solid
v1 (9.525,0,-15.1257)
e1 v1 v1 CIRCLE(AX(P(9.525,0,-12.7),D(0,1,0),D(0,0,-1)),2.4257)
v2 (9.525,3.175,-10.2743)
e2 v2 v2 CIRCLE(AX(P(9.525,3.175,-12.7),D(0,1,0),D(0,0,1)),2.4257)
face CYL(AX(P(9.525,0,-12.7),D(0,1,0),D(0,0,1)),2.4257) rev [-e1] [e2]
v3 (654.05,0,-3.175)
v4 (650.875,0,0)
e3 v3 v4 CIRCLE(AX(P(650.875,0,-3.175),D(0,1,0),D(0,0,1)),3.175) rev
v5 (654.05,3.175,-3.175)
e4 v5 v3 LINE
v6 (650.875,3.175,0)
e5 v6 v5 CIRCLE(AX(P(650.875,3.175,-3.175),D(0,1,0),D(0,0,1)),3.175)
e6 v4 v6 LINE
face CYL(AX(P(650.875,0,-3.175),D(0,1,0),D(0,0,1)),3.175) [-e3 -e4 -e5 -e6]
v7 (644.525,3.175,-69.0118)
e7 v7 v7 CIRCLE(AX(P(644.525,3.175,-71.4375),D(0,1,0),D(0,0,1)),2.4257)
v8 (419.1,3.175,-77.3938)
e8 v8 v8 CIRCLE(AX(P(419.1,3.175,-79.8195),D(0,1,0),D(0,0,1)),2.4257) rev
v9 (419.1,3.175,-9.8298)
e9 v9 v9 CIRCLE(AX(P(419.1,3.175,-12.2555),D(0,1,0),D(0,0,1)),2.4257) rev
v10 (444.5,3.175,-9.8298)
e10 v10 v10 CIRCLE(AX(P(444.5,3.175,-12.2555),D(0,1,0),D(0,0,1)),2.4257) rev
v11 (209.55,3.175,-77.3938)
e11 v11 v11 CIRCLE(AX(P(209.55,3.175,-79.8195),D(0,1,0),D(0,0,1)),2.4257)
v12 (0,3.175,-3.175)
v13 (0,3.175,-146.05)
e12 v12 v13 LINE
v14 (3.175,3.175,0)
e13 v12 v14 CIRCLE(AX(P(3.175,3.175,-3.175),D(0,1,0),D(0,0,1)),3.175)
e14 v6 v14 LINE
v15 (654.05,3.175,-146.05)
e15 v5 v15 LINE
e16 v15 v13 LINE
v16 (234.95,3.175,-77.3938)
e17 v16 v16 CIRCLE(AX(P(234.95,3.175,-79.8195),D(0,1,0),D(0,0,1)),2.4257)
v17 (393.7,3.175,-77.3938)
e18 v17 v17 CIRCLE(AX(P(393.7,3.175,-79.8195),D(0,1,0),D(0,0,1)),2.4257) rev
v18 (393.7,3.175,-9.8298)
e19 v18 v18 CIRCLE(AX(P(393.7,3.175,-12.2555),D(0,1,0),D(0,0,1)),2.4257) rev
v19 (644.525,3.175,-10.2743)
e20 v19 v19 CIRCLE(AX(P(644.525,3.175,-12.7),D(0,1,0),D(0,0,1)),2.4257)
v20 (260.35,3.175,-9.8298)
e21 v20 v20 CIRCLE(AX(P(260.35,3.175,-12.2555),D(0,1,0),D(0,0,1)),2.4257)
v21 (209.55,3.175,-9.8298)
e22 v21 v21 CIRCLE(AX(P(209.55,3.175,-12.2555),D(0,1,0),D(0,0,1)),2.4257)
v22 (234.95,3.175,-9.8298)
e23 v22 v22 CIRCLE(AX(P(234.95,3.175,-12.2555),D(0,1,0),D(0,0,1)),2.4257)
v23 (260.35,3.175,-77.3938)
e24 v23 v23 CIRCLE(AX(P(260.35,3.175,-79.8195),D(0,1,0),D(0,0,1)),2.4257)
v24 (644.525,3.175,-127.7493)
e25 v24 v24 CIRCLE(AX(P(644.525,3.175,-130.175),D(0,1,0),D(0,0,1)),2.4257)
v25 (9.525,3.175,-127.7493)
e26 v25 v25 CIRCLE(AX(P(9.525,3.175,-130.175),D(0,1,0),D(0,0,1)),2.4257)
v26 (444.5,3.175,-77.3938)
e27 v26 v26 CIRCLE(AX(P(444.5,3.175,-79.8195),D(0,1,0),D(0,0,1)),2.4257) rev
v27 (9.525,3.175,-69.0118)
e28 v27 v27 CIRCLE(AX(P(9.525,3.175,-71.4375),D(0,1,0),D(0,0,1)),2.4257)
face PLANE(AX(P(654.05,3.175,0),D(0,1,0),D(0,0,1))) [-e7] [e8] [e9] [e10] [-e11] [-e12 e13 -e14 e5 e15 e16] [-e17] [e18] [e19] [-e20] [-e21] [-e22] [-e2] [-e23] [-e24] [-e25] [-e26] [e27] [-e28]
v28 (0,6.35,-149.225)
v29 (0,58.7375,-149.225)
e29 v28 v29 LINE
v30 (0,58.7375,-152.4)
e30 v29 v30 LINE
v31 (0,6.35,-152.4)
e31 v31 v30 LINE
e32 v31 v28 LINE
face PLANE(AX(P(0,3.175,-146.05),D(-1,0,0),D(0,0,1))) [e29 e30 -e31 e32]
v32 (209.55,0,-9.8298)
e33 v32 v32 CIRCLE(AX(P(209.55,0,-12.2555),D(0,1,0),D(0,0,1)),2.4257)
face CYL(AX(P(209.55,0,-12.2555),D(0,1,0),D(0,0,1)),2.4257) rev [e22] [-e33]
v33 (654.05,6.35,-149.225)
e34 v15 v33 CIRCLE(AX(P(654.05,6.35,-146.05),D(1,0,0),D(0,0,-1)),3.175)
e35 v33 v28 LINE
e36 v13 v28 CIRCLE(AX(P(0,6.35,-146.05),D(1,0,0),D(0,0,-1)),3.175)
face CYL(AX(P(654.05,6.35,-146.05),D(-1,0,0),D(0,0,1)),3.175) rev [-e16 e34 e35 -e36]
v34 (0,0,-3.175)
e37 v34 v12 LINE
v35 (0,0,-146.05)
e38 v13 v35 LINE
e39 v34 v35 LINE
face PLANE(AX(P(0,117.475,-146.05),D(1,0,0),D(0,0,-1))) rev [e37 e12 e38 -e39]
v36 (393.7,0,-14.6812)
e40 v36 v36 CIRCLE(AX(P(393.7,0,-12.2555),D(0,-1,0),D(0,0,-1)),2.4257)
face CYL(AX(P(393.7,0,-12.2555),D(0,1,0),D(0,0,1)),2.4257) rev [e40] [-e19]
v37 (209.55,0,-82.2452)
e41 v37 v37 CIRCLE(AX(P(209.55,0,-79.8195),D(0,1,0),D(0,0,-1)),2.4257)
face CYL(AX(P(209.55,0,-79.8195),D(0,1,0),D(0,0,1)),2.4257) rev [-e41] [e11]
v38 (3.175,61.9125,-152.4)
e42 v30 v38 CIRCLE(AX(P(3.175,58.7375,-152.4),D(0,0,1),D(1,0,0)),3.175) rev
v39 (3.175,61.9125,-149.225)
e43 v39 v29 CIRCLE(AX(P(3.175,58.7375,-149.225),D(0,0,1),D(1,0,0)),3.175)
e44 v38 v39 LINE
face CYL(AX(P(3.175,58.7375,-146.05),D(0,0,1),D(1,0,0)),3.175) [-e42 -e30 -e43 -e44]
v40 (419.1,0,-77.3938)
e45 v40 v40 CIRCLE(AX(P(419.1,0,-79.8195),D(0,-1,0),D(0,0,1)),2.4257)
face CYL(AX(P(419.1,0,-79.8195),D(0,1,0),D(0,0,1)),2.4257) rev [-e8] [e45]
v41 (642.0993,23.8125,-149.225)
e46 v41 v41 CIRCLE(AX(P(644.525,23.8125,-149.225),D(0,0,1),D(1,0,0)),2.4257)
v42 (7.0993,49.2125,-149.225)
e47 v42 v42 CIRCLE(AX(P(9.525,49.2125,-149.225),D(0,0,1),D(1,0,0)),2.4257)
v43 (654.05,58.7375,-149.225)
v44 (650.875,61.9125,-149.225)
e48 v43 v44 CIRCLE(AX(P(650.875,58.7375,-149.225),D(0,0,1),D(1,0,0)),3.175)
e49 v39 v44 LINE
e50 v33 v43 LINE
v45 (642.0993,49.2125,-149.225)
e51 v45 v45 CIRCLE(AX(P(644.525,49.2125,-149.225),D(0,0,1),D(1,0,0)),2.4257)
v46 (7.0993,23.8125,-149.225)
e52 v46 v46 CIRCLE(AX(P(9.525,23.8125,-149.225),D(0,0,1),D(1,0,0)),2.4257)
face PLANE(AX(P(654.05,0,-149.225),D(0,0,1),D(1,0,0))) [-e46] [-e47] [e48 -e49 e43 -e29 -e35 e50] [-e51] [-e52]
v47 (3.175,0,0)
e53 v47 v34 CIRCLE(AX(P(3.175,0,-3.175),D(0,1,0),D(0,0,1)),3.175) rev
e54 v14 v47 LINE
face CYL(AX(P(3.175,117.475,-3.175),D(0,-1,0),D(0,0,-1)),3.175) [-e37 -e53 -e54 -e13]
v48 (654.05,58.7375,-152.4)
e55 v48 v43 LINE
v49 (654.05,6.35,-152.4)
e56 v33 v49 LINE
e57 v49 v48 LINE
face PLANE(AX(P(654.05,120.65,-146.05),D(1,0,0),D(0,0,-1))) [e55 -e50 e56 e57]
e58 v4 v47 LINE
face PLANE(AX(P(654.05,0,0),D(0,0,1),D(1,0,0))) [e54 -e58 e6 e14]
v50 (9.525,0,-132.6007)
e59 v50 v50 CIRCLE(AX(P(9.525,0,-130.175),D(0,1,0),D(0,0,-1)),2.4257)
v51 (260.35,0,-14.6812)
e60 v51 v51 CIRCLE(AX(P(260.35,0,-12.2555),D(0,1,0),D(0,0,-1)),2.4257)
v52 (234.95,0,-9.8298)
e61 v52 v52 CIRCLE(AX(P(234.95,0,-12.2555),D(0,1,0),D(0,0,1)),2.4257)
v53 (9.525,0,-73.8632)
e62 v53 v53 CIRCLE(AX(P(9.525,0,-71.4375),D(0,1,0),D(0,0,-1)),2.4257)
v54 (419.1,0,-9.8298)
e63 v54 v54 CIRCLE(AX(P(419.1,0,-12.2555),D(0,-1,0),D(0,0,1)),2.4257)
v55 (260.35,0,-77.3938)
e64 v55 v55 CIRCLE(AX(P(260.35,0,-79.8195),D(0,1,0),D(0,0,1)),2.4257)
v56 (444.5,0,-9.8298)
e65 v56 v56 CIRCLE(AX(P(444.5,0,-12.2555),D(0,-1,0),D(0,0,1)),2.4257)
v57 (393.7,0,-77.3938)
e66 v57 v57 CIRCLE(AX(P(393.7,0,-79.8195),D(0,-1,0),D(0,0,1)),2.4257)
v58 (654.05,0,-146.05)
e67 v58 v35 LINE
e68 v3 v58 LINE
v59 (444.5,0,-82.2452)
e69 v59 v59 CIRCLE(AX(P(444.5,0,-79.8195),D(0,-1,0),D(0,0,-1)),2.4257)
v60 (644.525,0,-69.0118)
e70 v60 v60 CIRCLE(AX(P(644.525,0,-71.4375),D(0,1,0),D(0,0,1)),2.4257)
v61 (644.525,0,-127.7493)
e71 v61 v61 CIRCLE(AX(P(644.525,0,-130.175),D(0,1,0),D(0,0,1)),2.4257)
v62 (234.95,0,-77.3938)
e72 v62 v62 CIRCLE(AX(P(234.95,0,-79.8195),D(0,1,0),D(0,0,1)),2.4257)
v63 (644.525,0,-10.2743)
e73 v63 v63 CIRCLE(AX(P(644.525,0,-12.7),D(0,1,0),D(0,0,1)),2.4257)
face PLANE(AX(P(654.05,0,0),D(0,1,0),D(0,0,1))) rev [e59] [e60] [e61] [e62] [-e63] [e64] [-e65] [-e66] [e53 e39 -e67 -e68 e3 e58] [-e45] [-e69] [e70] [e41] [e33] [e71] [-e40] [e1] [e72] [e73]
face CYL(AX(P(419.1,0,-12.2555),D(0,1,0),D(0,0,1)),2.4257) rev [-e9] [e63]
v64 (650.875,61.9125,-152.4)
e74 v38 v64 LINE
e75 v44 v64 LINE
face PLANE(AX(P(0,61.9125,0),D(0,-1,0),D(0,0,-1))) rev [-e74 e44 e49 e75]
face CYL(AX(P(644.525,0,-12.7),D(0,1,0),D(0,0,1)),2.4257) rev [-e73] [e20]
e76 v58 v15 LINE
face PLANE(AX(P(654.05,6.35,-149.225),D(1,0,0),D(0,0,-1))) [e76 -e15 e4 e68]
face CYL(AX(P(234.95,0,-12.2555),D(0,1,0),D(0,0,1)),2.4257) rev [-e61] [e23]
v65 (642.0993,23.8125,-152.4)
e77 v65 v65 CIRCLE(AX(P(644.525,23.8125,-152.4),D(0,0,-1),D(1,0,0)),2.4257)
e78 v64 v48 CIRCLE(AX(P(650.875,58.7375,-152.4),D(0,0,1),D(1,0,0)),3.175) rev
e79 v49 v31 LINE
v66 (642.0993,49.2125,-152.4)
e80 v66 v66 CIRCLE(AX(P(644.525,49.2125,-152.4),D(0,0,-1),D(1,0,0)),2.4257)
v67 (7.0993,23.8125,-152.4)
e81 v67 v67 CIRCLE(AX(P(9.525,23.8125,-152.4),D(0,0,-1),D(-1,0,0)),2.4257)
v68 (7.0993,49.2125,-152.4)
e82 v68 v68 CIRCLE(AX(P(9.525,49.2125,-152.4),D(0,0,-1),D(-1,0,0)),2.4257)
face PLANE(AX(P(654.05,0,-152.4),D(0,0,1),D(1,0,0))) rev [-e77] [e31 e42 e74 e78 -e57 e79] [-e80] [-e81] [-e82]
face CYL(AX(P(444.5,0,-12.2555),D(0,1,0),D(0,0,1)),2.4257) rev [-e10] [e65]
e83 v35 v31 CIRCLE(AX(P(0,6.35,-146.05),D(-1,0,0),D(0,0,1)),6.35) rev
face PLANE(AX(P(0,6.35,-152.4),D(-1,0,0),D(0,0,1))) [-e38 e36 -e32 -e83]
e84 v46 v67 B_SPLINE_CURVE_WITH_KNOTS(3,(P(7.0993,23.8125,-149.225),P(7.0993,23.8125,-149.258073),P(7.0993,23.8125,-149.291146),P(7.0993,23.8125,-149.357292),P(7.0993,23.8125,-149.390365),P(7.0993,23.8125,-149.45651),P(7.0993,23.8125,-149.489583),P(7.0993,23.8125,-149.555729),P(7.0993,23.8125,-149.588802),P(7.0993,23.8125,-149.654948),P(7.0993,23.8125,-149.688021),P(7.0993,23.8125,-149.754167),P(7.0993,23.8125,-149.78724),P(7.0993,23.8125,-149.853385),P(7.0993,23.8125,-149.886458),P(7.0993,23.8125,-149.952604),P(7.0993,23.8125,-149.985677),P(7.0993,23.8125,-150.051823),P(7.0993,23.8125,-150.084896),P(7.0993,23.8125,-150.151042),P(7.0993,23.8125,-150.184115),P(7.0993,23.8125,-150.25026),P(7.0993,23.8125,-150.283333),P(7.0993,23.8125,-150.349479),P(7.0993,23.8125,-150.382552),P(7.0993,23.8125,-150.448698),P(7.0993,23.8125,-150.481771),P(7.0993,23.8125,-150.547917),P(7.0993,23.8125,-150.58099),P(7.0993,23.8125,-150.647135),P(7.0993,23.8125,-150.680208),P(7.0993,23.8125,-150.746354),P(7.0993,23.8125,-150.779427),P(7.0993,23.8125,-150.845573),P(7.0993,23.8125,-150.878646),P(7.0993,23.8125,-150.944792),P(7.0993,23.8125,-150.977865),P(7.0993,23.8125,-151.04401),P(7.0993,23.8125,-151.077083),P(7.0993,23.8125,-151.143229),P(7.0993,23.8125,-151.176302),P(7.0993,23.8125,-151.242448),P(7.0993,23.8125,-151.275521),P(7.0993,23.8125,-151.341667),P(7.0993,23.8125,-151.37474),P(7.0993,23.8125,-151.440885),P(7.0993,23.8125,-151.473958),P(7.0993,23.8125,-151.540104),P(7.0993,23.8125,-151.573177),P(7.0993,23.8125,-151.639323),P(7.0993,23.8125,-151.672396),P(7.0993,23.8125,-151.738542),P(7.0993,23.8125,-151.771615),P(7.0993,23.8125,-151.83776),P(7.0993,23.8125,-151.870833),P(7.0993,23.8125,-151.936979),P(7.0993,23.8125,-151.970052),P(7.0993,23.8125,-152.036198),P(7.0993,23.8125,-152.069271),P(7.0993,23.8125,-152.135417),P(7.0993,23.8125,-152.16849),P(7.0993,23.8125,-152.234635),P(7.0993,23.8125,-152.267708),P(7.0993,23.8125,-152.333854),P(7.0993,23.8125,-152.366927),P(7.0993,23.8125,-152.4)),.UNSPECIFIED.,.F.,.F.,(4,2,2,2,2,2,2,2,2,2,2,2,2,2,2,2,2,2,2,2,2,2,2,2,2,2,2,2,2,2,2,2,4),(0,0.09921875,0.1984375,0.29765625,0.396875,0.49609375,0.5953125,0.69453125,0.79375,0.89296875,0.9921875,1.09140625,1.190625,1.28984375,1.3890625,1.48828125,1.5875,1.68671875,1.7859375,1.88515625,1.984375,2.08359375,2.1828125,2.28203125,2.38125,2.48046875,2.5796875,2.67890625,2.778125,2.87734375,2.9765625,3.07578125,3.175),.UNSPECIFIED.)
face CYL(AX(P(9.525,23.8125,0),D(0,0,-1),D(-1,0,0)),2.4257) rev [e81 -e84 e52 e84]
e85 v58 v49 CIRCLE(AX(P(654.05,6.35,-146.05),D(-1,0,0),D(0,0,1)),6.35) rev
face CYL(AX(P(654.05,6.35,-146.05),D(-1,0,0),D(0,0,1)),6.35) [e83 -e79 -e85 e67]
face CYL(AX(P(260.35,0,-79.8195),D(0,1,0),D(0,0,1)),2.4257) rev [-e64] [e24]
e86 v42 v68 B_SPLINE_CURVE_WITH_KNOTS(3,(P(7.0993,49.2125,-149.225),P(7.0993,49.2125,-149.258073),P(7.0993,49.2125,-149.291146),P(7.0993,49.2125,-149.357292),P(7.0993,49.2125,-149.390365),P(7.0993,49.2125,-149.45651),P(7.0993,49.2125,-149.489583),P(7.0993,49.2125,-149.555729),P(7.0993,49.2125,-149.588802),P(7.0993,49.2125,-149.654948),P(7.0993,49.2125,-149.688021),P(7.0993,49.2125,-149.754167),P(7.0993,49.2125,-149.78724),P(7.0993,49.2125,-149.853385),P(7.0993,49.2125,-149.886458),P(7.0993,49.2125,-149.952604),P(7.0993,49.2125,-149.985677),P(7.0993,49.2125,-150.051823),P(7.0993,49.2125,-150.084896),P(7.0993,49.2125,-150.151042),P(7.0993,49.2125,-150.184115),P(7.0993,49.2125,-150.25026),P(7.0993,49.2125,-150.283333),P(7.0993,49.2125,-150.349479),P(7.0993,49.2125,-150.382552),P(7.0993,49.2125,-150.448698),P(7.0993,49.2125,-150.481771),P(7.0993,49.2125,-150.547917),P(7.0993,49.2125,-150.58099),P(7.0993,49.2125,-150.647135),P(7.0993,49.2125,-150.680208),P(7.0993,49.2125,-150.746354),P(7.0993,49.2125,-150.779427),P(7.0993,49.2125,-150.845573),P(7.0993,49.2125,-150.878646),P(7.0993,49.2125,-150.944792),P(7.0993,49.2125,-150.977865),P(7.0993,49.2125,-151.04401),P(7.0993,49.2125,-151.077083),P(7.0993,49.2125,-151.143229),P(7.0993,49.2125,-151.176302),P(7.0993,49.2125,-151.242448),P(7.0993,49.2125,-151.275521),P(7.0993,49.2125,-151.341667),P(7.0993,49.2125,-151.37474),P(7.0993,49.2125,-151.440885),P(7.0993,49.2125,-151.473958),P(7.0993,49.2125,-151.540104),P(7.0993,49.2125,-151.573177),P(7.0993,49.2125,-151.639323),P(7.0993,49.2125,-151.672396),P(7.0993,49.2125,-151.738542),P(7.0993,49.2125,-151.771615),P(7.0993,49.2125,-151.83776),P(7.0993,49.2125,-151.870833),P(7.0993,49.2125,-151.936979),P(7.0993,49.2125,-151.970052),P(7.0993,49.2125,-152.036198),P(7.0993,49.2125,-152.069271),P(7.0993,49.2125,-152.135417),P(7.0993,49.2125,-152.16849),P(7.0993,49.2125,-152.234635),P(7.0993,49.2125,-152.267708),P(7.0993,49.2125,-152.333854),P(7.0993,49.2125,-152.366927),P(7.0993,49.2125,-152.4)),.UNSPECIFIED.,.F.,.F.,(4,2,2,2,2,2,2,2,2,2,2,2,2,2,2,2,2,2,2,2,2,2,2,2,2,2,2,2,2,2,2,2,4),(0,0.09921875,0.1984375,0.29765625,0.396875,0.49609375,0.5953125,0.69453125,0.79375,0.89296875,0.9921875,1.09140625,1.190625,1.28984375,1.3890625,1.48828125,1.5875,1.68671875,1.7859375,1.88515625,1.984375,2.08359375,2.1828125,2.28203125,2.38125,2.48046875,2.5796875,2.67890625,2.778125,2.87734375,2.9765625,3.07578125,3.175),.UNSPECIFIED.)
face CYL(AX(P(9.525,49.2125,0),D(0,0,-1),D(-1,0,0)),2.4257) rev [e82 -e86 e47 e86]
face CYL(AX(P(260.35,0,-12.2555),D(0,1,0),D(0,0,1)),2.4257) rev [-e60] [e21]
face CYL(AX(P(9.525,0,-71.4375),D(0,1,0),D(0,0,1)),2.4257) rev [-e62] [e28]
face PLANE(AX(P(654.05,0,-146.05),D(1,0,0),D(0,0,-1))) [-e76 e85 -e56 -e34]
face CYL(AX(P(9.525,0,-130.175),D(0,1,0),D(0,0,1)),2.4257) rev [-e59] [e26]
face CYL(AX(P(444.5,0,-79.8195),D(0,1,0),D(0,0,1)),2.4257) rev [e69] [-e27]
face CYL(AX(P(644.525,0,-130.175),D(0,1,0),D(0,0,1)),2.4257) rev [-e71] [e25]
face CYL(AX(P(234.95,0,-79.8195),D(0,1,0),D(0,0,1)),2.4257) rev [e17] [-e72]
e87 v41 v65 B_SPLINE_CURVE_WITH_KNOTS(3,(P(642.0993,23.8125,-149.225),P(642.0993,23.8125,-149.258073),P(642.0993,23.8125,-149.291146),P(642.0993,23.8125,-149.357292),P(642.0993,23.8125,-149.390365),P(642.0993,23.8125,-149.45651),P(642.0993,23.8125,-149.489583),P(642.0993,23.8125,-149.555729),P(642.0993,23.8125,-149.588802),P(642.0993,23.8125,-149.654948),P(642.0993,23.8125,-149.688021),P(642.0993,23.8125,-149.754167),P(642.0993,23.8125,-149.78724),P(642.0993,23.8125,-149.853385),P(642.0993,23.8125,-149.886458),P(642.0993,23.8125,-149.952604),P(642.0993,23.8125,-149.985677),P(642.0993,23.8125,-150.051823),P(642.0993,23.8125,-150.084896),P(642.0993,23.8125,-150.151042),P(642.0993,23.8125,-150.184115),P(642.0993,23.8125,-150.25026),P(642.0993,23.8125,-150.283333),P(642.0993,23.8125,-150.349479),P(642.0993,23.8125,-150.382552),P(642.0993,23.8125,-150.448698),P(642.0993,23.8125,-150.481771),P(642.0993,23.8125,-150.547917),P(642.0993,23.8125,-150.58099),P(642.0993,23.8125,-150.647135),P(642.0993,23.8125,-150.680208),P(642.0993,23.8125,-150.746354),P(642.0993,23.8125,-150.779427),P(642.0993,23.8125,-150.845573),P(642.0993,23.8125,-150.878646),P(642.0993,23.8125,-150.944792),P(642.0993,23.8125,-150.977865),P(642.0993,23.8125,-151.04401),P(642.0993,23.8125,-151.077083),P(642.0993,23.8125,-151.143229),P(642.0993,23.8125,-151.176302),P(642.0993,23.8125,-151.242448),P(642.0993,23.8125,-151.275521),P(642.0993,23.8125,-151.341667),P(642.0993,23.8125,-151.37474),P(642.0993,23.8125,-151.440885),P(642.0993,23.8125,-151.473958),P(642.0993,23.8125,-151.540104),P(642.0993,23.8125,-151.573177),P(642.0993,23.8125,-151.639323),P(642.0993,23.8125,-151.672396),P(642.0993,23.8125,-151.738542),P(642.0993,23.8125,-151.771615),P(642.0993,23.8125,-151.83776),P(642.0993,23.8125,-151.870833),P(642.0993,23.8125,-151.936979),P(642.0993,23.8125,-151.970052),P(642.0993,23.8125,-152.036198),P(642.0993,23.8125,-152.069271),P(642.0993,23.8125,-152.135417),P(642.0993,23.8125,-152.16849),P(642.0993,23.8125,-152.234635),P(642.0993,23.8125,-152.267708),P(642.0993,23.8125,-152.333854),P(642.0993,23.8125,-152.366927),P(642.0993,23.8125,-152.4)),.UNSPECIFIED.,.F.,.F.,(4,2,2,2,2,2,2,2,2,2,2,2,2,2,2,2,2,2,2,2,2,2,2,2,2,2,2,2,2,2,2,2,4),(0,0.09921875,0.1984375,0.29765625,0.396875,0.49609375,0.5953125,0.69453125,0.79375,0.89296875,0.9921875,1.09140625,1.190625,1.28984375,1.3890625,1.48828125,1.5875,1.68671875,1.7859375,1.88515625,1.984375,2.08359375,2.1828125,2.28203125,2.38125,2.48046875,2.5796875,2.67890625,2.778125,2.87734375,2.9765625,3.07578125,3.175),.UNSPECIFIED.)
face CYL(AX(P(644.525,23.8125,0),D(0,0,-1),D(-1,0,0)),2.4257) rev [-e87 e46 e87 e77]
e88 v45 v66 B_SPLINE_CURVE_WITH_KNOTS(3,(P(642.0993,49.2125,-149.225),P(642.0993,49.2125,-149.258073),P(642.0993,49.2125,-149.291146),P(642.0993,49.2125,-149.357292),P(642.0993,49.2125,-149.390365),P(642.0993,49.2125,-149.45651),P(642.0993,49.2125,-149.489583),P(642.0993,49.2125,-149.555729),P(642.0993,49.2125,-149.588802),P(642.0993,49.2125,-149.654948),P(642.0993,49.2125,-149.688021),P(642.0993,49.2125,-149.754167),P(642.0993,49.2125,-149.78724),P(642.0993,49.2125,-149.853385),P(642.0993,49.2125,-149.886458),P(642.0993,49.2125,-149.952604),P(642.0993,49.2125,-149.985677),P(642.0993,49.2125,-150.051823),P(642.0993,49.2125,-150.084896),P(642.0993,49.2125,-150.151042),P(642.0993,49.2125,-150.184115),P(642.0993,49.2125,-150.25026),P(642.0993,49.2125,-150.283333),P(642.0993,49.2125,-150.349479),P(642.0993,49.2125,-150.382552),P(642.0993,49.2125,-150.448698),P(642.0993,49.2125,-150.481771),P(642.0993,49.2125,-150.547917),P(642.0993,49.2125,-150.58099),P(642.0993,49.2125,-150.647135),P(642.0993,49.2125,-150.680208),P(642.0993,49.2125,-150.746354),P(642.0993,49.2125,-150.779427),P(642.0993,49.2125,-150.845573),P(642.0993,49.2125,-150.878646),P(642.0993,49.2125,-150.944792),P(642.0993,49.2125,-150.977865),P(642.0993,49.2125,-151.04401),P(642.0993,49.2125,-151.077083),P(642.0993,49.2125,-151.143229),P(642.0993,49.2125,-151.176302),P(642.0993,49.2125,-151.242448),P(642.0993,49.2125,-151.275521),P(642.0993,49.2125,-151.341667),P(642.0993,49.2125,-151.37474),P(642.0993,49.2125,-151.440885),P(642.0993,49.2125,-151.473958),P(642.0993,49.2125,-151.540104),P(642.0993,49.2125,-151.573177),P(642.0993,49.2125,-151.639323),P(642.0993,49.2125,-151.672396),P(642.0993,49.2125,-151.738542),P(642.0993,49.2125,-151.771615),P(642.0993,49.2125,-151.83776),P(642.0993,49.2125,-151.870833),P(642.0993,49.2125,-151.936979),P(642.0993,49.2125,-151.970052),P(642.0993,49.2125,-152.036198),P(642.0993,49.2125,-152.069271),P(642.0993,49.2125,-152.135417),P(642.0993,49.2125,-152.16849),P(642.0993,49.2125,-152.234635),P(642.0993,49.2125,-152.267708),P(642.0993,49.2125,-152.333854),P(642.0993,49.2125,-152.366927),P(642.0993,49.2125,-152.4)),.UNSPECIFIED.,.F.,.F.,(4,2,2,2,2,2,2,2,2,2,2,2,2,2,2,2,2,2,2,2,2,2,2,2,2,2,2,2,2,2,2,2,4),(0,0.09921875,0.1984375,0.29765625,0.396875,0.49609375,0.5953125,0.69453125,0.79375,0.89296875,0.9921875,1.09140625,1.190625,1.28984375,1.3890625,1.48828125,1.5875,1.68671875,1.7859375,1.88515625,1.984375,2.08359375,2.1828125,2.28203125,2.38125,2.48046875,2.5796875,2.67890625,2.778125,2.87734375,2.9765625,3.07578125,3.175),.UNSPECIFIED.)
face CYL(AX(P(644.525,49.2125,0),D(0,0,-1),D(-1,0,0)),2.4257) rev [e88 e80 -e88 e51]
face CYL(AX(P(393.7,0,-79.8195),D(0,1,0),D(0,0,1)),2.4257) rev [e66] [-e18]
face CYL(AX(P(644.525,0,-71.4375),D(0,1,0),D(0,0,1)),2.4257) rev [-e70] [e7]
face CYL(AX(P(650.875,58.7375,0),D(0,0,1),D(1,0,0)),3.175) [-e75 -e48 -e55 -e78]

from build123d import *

# Parameters (mm, degrees)
BASE_FLANGE1_DEPTH = 654.05
SKETCH6_R          = 21.9075
CUT_EXTRUDE1_DEPTH = 3.175
SKETCH7_R          = 2.4257
CUT_EXTRUDE2_DEPTH = 683.89076222
SKETCH8_R          = 2.4257
CUT_EXTRUDE3_DEPTH = 683.89076222
SKETCH9_R          = 2.4257
CUT_EXTRUDE4_DEPTH = 683.89076222
FILLET1_R          = 3.175
SKETCH10_W         = 152.4
SKETCH10_H         = 61.9125
CUT_EXTRUDE6_DEPTH = 683.89076222
FILLET2_R          = 3.175


# Sheet-metal steps are written as plain solids
with BuildPart() as part:
    # Sketch1 → Base-Flange1 (new body)
    with BuildSketch(Plane(origin=(0, 0, 0), x_dir=(0, 0, -1), z_dir=(1, 0, 0))):
        with BuildLine():
            Line((0, 0), (146.05, 0))
            ThreePointArc((146.05, 0), (150.540128061, 1.859871939), (152.4, 6.35))
            Line((152.4, 6.35), (152.4, 117.475))
            ThreePointArc((152.4, 117.475), (150.540128061, 121.965128061), (146.05, 123.825))
            Line((146.05, 123.825), (0, 123.825))
            Line((0, 123.825), (0, 120.65))
            Line((0, 120.65), (146.05, 120.65))
            ThreePointArc((146.05, 120.65), (148.29506403, 119.72006403), (149.225, 117.475))
            Line((149.225, 117.475), (149.225, 6.35))
            ThreePointArc((149.225, 6.35), (148.29506403, 4.10493597), (146.05, 3.175))
            Line((146.05, 3.175), (0, 3.175))
            Line((0, 3.175), (0, 0))
        make_face()
    extrude(amount=BASE_FLANGE1_DEPTH)

    # Sketch6 → Cut-Extrude1 (cut)
    with BuildSketch(Plane(origin=(0, 123.825, 0), x_dir=(1, 0, 0), z_dir=(0, 1, 0))):
        with Locations(Location((234.95, 46.0375, 0), (0, 0, 270))):
            Circle(SKETCH6_R)
    extrude(amount=-CUT_EXTRUDE1_DEPTH, mode=Mode.SUBTRACT)

    # Sketch7 → Cut-Extrude2 (cut, through all)
    with BuildSketch(Plane(origin=(0, 123.825, 0), x_dir=(1, 0, 0), z_dir=(0, 1, 0))):
        with Locations(Location((234.95, 12.2555, 0), (0, 0, 270))):
            Circle(SKETCH7_R)
        with Locations(Location((234.95, 79.8195, 0), (0, 0, 270))):
            Circle(SKETCH7_R)
        with Locations(Location((209.55, 12.2555, 0), (0, 0, 270))):
            Circle(SKETCH7_R)
        with Locations(Location((260.35, 12.2555, 0), (0, 0, 270))):
            Circle(SKETCH7_R)
        with Locations(Location((260.35, 79.8195, 0), (0, 0, 270))):
            Circle(SKETCH7_R)
        with Locations(Location((209.55, 79.8195, 0), (0, 0, 270))):
            Circle(SKETCH7_R)
    cut_extrude2 = extrude(amount=-CUT_EXTRUDE2_DEPTH, mode=Mode.SUBTRACT)

    # Sketch8 → Cut-Extrude3 (cut, through all)
    with BuildSketch(Plane(origin=(0, 123.825, 0), x_dir=(1, 0, 0), z_dir=(0, 1, 0))):
        with Locations(Location((644.525, 12.7, 0), (0, 0, 270))):
            Circle(SKETCH8_R)
        with Locations(Location((644.525, 71.4375, 0), (0, 0, 270))):
            Circle(SKETCH8_R)
        with Locations(Location((644.525, 130.175, 0), (0, 0, 270))):
            Circle(SKETCH8_R)
        with Locations(Location((9.525, 130.175, 0), (0, 0, 270))):
            Circle(SKETCH8_R)
        with Locations(Location((9.525, 71.4375, 0), (0, 0, 270))):
            Circle(SKETCH8_R)
        with Locations(Location((9.525, 12.7, 0), (0, 0, 270))):
            Circle(SKETCH8_R)
    extrude(amount=-CUT_EXTRUDE3_DEPTH, mode=Mode.SUBTRACT)

    # Sketch9 → Cut-Extrude4 (cut, through all)
    with BuildSketch(Plane(origin=(0, 0, -152.4), x_dir=(-1, 0, 0), z_dir=(0, 0, -1))):
        with Locations((-644.525, 74.6125)):
            Circle(SKETCH9_R)
        with Locations((-644.525, 49.2125)):
            Circle(SKETCH9_R)
        with Locations((-9.525, 49.2125)):
            Circle(SKETCH9_R)
        with Locations((-9.525, 74.6125)):
            Circle(SKETCH9_R)
        with Locations((-644.525, 100.0125)):
            Circle(SKETCH9_R)
        with Locations((-644.525, 23.8125)):
            Circle(SKETCH9_R)
        with Locations((-9.525, 23.8125)):
            Circle(SKETCH9_R)
        with Locations((-9.525, 100.0125)):
            Circle(SKETCH9_R)
    extrude(amount=-CUT_EXTRUDE4_DEPTH, mode=Mode.SUBTRACT)

    # Fillet1
    fillet1_edges = [part.edges().sort_by_distance(p)[0] for p in [
        (0, 1.5875, 0),
        (0, 122.2375, 0),
        (654.05, 1.5875, 0),
        (654.05, 122.2375, 0),
    ]]
    fillet(fillet1_edges, radius=FILLET1_R)

    # Sketch10 → Cut-Extrude6 (cut, through all)
    with BuildSketch(Plane(origin=(654.05, 0, 0), x_dir=(0, 0, -1), z_dir=(1, 0, 0))):
        with Locations((76.2, 92.86875)):
            Rectangle(SKETCH10_W, SKETCH10_H)
    extrude(amount=-CUT_EXTRUDE6_DEPTH, mode=Mode.SUBTRACT)

    # Fillet2
    fillet2_edges = [part.edges().sort_by_distance(p)[0] for p in [
        (654.05, 61.9125, -150.8125),
        (0, 61.9125, -150.8125),
    ]]
    fillet(fillet2_edges, radius=FILLET2_R)

    # Mirror1: Cut-Extrude2 across plane
    add(cut_extrude2.mirror(Plane(origin=(327.025, 0, 0), x_dir=(0, 0, 1), z_dir=(1, 0, 0))), mode=Mode.SUBTRACT)


solid = part.part
